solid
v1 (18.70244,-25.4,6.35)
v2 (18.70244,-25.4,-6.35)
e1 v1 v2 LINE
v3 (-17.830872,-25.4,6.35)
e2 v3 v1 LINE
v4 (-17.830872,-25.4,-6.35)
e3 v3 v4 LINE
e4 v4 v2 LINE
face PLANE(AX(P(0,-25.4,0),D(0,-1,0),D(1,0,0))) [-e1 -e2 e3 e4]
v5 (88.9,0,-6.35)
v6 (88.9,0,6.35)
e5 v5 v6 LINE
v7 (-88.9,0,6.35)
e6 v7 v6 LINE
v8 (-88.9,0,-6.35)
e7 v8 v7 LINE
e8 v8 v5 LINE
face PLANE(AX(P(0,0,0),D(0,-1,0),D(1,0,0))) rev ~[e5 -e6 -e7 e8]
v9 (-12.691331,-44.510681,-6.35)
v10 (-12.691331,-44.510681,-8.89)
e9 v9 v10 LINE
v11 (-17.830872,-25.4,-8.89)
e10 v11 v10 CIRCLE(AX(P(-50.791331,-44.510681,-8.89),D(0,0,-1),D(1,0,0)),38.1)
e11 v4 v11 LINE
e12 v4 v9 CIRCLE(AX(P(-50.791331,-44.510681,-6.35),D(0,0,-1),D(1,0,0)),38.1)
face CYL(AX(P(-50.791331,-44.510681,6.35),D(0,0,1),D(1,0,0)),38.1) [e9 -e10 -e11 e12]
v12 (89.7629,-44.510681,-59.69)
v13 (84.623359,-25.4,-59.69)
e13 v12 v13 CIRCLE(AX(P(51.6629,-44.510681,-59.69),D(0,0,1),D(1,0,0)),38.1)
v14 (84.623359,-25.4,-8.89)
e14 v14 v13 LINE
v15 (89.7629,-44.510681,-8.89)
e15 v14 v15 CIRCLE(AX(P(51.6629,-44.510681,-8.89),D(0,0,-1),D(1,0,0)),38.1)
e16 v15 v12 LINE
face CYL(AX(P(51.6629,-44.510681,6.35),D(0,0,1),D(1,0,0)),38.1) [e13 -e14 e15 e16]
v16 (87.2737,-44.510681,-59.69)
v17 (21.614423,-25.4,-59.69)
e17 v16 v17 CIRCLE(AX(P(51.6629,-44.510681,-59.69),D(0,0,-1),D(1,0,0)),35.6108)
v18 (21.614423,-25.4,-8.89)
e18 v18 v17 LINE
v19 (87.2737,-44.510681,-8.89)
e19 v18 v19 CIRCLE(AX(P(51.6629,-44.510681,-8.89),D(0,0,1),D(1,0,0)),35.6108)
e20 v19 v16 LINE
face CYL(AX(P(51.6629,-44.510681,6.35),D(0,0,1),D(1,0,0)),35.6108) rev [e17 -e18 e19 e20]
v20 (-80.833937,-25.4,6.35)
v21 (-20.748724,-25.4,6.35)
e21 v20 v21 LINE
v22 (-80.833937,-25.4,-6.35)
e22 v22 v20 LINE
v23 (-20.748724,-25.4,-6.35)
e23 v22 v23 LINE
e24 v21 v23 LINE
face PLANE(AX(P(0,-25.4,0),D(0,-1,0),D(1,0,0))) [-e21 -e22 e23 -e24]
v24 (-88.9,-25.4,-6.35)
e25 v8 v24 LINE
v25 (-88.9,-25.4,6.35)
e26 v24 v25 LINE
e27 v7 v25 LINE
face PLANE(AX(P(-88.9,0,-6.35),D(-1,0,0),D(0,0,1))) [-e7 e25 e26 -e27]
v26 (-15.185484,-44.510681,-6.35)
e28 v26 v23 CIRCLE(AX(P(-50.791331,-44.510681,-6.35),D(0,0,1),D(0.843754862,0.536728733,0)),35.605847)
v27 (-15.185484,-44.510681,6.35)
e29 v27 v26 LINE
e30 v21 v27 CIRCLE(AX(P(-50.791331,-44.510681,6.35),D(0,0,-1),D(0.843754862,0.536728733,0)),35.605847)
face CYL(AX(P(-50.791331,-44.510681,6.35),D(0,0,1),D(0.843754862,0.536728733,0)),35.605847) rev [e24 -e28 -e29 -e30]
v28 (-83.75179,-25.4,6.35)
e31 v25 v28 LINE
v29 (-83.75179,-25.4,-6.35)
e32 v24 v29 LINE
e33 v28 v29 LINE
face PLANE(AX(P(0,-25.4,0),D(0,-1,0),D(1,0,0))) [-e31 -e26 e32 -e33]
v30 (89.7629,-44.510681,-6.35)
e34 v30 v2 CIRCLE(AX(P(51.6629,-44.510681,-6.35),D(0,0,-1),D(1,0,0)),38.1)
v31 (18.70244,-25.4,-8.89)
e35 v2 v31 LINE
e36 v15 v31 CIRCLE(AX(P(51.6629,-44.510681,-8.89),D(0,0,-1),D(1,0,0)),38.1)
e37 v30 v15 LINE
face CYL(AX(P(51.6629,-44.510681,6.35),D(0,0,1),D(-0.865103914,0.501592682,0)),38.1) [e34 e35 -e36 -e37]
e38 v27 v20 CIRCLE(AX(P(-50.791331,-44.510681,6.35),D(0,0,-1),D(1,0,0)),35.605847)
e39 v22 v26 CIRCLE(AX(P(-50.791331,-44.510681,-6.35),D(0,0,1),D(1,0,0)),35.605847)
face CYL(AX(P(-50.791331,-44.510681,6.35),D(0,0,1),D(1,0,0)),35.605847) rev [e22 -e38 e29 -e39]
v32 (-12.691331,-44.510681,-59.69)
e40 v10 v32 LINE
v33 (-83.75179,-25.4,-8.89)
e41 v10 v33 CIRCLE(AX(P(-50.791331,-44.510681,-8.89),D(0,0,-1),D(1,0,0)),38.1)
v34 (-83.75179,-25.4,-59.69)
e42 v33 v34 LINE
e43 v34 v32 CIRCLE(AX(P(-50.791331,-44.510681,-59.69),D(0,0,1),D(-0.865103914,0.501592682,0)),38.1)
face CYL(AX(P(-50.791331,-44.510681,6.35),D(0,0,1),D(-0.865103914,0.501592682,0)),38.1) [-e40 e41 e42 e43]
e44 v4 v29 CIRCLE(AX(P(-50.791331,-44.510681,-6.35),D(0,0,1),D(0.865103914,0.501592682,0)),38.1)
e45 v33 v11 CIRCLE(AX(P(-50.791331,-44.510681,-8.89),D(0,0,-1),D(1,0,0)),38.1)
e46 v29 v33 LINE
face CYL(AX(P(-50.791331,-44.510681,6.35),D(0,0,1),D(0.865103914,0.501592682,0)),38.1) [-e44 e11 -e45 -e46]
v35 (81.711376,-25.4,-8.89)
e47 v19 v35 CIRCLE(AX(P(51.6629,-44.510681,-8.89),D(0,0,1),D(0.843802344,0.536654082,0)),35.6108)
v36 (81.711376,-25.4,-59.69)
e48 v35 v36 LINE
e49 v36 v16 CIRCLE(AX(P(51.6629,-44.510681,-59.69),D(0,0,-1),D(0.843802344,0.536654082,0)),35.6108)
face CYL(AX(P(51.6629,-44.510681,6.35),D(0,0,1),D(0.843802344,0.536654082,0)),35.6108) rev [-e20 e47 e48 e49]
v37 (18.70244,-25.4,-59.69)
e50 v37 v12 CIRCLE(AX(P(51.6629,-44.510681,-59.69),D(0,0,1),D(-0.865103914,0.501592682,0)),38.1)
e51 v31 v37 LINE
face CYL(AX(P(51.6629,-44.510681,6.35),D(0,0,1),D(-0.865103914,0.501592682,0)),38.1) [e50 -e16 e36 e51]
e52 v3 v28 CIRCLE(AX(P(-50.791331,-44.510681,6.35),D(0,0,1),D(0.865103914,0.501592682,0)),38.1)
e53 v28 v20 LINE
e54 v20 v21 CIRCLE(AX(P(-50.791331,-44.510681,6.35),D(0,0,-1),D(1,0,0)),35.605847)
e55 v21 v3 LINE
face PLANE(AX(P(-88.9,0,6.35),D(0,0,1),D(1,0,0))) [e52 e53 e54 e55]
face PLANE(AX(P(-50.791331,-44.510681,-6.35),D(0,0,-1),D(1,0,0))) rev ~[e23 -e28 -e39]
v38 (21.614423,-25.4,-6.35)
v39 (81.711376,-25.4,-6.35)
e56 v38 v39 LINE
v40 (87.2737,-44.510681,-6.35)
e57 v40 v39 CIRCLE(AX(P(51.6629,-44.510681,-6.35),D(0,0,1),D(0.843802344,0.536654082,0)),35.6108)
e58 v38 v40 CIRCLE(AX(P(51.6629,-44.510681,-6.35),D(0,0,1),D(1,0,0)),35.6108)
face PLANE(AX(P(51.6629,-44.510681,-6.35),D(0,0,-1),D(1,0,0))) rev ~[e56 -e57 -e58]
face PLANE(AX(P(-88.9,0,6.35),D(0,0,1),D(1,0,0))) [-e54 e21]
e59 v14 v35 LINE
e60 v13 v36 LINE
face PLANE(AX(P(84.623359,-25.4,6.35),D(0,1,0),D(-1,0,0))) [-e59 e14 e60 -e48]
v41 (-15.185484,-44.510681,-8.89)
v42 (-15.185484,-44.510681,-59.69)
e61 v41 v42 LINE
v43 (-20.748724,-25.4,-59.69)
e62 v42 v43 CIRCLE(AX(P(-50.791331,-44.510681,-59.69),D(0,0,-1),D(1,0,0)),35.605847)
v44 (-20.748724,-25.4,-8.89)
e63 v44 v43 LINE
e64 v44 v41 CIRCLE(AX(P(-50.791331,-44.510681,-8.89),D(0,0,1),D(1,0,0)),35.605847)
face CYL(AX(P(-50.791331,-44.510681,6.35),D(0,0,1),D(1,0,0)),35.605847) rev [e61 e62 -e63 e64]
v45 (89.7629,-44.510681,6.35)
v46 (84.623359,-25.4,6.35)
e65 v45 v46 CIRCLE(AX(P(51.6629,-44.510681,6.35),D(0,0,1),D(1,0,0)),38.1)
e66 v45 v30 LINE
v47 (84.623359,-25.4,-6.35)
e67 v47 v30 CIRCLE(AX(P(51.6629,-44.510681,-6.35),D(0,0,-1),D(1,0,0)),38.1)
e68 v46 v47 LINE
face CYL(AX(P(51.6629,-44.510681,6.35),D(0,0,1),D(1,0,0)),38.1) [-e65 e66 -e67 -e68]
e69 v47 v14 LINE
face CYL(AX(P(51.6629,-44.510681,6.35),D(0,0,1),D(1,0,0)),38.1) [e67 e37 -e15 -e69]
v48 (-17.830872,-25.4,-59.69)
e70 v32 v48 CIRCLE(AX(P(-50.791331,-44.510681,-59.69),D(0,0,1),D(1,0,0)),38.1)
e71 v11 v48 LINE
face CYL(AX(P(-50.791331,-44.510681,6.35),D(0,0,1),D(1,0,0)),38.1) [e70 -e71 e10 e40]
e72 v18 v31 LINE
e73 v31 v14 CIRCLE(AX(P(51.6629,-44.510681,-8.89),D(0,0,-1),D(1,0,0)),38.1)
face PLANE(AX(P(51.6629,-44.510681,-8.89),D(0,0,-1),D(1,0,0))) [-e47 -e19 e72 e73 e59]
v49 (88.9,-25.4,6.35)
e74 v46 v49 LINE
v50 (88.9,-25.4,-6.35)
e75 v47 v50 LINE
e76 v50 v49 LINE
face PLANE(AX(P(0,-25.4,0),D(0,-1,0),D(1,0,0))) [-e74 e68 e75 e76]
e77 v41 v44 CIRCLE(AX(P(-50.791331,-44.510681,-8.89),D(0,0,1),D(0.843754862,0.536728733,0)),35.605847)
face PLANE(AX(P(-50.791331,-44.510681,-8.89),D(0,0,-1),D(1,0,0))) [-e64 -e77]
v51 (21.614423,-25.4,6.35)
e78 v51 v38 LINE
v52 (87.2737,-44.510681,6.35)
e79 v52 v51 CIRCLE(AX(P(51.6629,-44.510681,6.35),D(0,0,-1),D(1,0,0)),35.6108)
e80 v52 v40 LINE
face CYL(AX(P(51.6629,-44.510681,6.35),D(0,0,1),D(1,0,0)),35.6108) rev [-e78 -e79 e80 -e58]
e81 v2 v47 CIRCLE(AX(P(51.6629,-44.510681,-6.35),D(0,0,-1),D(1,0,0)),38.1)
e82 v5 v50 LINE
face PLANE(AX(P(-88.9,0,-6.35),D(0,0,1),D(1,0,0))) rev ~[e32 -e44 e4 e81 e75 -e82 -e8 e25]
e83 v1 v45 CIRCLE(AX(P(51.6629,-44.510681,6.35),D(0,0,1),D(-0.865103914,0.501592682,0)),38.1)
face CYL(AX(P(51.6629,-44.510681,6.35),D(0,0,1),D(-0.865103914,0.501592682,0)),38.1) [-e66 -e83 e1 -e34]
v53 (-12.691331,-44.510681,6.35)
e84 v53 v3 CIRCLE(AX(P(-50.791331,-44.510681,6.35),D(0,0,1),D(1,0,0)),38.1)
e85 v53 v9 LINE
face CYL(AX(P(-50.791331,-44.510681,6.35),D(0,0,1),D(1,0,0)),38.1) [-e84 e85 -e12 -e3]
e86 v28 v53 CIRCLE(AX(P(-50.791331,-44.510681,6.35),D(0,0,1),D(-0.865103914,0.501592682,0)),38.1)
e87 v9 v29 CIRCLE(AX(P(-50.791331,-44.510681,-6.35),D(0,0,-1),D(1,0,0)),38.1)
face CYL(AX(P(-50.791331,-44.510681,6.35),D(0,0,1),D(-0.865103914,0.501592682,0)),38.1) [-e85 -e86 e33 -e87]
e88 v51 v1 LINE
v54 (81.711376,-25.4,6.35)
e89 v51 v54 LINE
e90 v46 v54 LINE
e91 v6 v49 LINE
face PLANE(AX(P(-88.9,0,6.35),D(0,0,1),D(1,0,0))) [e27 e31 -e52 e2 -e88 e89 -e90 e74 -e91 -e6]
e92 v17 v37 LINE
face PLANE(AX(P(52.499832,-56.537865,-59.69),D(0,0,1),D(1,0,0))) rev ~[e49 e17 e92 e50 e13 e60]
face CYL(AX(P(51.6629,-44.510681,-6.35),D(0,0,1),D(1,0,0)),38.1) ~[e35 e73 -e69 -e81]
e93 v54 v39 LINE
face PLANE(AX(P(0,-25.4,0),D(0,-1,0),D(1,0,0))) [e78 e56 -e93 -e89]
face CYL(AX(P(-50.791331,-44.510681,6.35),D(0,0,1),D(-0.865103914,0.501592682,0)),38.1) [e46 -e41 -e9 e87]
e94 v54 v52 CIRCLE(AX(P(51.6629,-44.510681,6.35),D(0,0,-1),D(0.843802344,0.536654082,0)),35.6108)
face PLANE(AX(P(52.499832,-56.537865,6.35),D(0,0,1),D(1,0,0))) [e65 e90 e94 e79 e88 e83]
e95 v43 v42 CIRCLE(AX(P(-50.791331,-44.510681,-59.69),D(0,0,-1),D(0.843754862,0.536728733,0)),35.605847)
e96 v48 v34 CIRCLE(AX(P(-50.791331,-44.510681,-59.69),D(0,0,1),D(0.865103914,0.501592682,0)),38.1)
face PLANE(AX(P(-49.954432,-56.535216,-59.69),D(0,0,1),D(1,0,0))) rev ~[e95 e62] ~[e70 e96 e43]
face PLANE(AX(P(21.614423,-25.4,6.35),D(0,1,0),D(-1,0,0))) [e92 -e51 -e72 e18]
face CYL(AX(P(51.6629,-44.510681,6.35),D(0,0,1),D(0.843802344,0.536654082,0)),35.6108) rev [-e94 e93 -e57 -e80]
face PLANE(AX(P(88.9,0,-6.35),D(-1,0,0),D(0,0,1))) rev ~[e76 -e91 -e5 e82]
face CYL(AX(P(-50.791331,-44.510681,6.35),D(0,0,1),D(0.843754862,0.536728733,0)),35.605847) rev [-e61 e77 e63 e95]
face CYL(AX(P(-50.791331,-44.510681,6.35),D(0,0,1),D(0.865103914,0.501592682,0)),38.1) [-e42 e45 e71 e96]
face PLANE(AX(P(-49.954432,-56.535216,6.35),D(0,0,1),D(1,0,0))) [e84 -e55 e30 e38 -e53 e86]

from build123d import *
from build123d import SkipClean  # not in build123d's __all__

# Parameters (mm, degrees)
F0_W     = 177.8
F0_H     = 12.7
F1_DEPTH = 25.4
F3_DEPTH = 66.04
F4_R     = 38.1
F5_DEPTH = 2.54


with BuildPart() as f1:
    # F0 (on Front) → F1 (new body)
    with BuildSketch(Plane.XZ):
        Rectangle(F0_W, F0_H)
    extrude(amount=F1_DEPTH)



with BuildPart() as f3:
    # F2 (on face) → F3 (new body)
    with BuildSketch(Plane.XY.offset(6.35)):
        with BuildLine():
            ThreePointArc((-83.7517897457, -25.4), (-60.6861906119, -81.3033672223), (-12.6913306355, -44.5106811821))
            ThreePointArc((-12.6913306355, -44.5106811821), (-13.9986445954, -34.6158212058), (-17.8308715254, -25.4))
            Line((-17.8308715254, -25.4), (-20.7487240634, -25.4))
            ThreePointArc((-20.7487240634, -25.4), (-16.6045729668, -34.558699219), (-15.1854835751, -44.5106811821))
            ThreePointArc((-15.1854835751, -44.5106811821), (-60.7433125987, -78.6974388509), (-80.8339372077, -25.4))
            Line((-80.8339372077, -25.4), (-83.7517897457, -25.4))
        make_face()
        with BuildLine():
            Line((-20.7487240634, -25.4), (-17.8308715254, -25.4))
            ThreePointArc((-17.8308715254, -25.4), (-50.7913306355, -6.4106811821), (-83.7517897457, -25.4))
            Line((-83.7517897457, -25.4), (-80.8339372077, -25.4))
            ThreePointArc((-80.8339372077, -25.4), (-50.7913306355, -8.9048341217), (-20.7487240634, -25.4))
        make_face()
    extrude(amount=-F3_DEPTH)


with BuildPart() as f3b:
    # F2 (on face) → F3, piece 2 (new body)
    with BuildSketch(Plane.XY.offset(6.35)):
        with BuildLine():
            Line((21.6144230301, -25.4), (18.7024404436, -25.4))
            ThreePointArc((18.7024404436, -25.4), (41.7680395775, -81.3033672223), (89.7628995538, -44.5106811821))
            ThreePointArc((89.7628995538, -44.5106811821), (88.4555855939, -34.6158212058), (84.623358664, -25.4))
            Line((84.623358664, -25.4), (81.7113760775, -25.4))
            ThreePointArc((81.7113760775, -25.4), (85.8548530255, -34.5588273636), (87.2736995538, -44.5106811821))
            ThreePointArc((87.2736995538, -44.5106811821), (41.7110457353, -78.7026346539), (21.6144230301, -25.4))
        make_face()
    extrude(amount=-F3_DEPTH)


with BuildPart() as f1_1:
    add(f1.part, clean=False)

    with SkipClean():  # cleaning this boolean's faces spoils the solid; the shape is the same uncleaned
        add(f3.part)  # F5 merges F3

    with SkipClean():  # cleaning this boolean's faces spoils the solid; the shape is the same uncleaned
        add(f3b.part)  # F5 merges F3b
    # F4 (on face) → F5 (join)
    with BuildSketch(Plane(origin=(0, 0, -6.35), x_dir=(1, 0, 0), z_dir=(0, 0, -1))):
        with Locations((-50.7913306355, 44.5106811821)):
            Circle(F4_R)
        with Locations((51.6628995538, 44.5106811821)):
            Circle(F4_R)
    with SkipClean():  # cleaning this boolean's faces spoils the solid; the shape is the same uncleaned
        extrude(amount=F5_DEPTH)


solid = f1_1.part
